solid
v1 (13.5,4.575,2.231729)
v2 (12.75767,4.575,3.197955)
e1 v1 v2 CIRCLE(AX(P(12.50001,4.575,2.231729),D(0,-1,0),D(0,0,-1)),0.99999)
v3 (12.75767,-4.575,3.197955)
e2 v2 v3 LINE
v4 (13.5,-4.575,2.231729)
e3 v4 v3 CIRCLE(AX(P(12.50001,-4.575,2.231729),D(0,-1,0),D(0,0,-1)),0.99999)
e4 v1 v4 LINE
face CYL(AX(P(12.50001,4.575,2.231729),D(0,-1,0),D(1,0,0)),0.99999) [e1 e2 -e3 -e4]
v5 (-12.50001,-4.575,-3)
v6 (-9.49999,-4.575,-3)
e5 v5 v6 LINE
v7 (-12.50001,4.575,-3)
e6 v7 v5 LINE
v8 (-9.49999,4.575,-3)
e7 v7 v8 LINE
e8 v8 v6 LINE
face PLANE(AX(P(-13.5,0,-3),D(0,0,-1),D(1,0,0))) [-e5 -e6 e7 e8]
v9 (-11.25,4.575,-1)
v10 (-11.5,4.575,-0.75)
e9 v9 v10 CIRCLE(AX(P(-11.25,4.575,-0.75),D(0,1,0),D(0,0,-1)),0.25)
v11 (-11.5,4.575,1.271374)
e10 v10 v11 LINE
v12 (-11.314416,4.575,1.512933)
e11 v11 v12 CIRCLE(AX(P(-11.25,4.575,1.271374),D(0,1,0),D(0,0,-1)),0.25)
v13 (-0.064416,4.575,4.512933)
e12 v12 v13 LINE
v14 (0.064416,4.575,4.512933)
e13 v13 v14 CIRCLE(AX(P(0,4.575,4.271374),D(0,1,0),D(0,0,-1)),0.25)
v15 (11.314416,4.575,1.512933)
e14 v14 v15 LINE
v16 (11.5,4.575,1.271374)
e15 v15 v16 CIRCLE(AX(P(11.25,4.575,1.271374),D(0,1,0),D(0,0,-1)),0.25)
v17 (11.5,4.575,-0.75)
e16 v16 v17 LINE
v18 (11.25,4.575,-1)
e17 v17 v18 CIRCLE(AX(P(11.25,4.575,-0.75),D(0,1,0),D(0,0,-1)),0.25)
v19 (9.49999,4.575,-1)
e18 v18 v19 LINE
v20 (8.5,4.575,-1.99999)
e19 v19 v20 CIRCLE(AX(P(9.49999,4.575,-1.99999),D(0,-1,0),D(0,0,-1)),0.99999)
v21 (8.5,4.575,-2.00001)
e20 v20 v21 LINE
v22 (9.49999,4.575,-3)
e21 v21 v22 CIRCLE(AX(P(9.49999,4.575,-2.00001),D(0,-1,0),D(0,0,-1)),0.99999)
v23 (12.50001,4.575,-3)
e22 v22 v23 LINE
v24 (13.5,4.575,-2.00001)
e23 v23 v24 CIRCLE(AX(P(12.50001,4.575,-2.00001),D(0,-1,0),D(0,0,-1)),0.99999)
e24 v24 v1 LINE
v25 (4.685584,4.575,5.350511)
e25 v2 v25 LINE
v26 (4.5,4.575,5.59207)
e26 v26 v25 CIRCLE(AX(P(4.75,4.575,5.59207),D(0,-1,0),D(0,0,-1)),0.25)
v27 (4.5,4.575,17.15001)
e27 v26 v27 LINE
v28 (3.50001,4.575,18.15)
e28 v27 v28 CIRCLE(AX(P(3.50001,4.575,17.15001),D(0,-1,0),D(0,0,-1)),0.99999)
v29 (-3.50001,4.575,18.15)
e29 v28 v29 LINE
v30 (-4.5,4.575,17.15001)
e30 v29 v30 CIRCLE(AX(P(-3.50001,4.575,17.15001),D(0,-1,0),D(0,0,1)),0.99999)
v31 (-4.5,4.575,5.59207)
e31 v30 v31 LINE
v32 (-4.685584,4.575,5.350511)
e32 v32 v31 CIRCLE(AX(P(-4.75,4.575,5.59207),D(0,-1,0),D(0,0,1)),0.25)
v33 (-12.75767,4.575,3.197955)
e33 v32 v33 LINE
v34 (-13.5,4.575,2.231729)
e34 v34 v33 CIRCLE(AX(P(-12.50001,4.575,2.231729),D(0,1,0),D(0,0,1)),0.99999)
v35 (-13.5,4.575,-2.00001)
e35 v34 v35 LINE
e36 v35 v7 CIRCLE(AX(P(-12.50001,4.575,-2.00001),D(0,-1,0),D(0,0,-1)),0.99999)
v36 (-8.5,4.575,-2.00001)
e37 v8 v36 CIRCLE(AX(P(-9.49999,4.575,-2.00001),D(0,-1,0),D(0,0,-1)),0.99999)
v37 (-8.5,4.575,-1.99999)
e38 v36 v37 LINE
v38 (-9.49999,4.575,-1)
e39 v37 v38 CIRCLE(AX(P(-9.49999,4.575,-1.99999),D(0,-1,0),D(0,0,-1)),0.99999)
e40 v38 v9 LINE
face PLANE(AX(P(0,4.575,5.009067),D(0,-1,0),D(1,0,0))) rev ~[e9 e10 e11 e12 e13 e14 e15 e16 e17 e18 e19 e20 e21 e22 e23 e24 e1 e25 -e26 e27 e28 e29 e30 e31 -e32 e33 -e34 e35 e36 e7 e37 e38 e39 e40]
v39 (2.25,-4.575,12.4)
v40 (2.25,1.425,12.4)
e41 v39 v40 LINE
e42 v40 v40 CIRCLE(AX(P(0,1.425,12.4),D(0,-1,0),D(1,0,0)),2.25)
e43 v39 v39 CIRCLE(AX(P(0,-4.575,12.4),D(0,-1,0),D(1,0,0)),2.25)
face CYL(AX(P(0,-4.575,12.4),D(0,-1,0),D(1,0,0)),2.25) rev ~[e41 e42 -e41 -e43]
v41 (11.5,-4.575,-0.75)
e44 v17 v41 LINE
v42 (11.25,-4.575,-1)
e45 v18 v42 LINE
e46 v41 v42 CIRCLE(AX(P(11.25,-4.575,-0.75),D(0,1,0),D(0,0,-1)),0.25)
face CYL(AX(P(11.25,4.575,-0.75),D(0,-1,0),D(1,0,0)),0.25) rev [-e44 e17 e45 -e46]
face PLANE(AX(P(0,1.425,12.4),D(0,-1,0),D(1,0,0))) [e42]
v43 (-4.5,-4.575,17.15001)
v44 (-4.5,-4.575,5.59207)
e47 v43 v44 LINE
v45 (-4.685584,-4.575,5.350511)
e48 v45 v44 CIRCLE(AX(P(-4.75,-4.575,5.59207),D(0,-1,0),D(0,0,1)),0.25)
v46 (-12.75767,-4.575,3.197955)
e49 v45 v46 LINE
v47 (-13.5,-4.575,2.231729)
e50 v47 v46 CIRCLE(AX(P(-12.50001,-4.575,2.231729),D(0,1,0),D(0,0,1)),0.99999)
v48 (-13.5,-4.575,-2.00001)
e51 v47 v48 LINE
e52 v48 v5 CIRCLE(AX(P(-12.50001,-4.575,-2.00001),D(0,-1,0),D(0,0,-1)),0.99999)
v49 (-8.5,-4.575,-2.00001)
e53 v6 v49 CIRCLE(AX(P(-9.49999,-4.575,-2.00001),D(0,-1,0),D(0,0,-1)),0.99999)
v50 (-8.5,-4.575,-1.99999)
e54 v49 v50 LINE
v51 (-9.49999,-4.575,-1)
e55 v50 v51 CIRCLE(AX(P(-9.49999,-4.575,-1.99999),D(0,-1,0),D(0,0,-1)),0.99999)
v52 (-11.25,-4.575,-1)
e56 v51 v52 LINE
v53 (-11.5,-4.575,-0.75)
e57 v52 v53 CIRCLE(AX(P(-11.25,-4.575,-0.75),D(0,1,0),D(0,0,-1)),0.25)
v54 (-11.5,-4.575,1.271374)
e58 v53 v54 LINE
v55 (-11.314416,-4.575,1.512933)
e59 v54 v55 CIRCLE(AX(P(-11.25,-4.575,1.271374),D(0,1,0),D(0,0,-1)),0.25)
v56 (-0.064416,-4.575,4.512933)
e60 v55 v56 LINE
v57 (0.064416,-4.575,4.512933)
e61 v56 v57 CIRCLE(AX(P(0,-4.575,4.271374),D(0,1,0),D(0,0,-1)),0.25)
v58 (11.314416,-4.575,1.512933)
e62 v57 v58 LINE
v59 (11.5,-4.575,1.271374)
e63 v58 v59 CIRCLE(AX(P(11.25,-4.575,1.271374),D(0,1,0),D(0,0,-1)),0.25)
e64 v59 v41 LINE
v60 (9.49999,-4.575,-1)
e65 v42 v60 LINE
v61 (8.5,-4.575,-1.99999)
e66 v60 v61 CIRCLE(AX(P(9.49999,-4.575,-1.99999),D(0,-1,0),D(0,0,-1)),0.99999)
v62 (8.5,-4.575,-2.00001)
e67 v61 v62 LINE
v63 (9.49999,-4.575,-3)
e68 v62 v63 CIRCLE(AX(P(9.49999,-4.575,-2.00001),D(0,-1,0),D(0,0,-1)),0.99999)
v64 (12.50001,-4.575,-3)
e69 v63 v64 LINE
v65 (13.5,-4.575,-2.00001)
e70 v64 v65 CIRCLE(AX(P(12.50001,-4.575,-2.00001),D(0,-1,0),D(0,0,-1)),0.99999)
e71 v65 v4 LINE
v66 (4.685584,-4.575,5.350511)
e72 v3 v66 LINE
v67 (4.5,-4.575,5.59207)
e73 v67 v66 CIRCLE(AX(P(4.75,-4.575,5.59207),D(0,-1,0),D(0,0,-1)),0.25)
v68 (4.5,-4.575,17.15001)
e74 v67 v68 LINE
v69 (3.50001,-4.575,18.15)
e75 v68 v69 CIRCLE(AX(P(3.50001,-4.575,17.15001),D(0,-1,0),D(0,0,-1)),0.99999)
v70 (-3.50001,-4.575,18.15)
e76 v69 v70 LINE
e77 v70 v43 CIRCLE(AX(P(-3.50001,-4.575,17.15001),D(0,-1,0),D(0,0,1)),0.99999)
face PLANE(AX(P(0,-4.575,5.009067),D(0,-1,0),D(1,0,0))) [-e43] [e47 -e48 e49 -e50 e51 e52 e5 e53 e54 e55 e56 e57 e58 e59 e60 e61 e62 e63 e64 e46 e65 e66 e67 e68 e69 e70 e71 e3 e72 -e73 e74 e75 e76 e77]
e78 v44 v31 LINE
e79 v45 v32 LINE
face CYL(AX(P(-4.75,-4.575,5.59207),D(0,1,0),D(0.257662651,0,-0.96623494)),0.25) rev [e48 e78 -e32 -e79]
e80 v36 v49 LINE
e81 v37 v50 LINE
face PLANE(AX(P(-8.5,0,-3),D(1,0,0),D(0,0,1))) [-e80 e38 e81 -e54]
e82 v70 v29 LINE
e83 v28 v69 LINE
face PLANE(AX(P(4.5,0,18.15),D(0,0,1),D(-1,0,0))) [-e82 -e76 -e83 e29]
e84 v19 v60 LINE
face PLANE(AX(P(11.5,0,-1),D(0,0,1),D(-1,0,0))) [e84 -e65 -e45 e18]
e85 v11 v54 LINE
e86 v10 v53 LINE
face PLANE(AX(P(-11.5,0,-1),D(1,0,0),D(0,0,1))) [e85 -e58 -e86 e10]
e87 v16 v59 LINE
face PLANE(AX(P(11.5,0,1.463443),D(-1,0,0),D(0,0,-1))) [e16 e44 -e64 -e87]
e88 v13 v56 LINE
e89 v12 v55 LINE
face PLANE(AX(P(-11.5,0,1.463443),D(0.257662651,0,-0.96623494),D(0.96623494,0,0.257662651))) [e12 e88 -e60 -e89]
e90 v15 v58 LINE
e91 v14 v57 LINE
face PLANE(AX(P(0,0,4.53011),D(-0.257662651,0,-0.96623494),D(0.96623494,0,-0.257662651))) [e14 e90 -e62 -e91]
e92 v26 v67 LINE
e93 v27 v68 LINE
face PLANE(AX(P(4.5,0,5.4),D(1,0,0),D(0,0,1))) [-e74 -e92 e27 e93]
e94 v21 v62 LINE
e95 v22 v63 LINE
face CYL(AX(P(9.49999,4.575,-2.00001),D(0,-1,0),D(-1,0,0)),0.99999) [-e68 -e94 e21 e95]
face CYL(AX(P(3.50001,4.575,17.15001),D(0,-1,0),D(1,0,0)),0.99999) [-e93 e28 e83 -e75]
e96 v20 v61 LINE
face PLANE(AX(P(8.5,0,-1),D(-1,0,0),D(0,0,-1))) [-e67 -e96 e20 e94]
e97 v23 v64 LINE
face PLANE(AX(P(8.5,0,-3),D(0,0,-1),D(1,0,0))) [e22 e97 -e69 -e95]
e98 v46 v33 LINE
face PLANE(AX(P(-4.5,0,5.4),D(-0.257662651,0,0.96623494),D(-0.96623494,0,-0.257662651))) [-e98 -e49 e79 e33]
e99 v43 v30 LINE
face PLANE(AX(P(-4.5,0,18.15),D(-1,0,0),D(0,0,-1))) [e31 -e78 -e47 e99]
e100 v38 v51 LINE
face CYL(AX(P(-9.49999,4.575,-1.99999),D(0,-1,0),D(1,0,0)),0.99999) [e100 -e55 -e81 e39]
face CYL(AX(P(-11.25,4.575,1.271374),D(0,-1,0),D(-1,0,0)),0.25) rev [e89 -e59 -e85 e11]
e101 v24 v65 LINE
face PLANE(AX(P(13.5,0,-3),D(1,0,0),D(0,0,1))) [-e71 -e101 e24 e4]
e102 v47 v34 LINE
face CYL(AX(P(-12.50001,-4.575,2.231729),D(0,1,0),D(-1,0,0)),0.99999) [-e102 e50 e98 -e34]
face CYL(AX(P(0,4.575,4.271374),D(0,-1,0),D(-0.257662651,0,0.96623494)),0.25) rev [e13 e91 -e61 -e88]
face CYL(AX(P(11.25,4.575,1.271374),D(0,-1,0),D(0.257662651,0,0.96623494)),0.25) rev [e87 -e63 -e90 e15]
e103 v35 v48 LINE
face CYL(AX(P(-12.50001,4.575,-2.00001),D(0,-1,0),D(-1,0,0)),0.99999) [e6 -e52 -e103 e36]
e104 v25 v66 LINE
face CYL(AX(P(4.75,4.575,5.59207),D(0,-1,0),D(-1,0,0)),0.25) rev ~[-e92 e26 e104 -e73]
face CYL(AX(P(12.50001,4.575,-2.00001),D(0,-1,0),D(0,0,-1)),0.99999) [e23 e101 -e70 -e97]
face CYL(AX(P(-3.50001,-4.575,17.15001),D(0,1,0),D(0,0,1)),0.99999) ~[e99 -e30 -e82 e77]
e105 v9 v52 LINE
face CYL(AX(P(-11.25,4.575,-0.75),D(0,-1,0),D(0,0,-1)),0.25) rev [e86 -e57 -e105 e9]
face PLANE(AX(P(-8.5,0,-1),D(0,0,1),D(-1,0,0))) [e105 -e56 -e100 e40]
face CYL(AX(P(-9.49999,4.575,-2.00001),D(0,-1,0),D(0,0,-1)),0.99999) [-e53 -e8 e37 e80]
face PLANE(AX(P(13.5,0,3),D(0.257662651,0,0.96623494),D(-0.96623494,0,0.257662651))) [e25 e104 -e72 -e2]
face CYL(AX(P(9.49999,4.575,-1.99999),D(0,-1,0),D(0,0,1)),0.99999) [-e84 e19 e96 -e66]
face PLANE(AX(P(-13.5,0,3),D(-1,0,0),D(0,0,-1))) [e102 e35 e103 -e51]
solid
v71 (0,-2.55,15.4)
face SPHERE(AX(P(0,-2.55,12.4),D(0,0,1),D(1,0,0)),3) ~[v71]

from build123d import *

# Parameters (mm, degrees)
F1_DEPTH      = 4.575
F1_DEPTH_BACK = 4.575
F2_R          = 2.25
F3_DEPTH      = 6
F4_R          = 0.99999
F5_R          = 0.25


# Not quite as in the source:
# - a fillet or chamfer is up to 0.001 mm smaller than in the source, because OpenCascade refuses the exact size


with BuildPart() as f1:
    # F0 (on Front) → F1 (new body, two sides)
    with BuildSketch(Plane.XZ) as f1_sk:
        Polygon((-13.5, 3), (-13.5, -3), (-8.5, -3), (-8.5, -1), (-11.5, -1), (-11.5, 1.4634433738), (0, 4.5301100405), (11.5, 1.4634433738), (11.5, -1), (8.5, -1), (8.5, -3), (13.5, -3), (13.5, 3), (4.5, 5.4), (4.5, 18.15), (-4.5, 18.15), (-4.5, 5.4), align=None)
    extrude(amount=F1_DEPTH)
    extrude(f1_sk.sketch, amount=-F1_DEPTH_BACK)

    # F2 (on face) → F3 (cut)
    with BuildSketch(Plane.XZ.offset(4.575)):
        with Locations((0, 12.4)):
            Circle(F2_R)
    extrude(amount=-F3_DEPTH, mode=Mode.SUBTRACT)

    # F4 (radius 1 in the source; OpenCascade refuses exactly that, so slightly less here)
    f4_edges = [f1.edges().sort_by_distance(p)[0] for p in [
        (-4.5, 0, 18.15),
        (4.5, 0, 18.15),
        (13.5, 0, 3),
        (13.5, 0, -3),
        (8.5, 0, -3),
        (8.5, 0, -1),
        (-8.5, 0, -3),
        (-8.5, 0, -1),
        (-13.5, 0, 3),
        (-13.5, 0, -3),
    ]]
    fillet(f4_edges, radius=F4_R)

    # F5
    f5_edges = [f1.edges().sort_by_distance(p)[0] for p in [
        (4.5, 0, 5.4),
        (-11.5, 0, -1),
        (-11.5, 0, 1.463443),
        (11.5, 0, -1),
        (11.5, 0, 1.463443),
        (0, 0, 4.53011),
        (-4.5, 0, 5.4),
    ]]
    fillet(f5_edges, radius=F5_R)


with BuildPart() as f8:
    # F7 (on offset) → F8 (revolve)
    with BuildSketch(Plane.XZ.offset(2.55)):
        with BuildLine():
            Line((0, 15.4), (0, 9.4))
            ThreePointArc((0, 9.4), (3, 12.4), (0, 15.4))
        make_face()
    revolve(axis=Axis((0, -2.55, 12.4), (0, 0, -1)))


solid = Compound([f1.part, f8.part])
